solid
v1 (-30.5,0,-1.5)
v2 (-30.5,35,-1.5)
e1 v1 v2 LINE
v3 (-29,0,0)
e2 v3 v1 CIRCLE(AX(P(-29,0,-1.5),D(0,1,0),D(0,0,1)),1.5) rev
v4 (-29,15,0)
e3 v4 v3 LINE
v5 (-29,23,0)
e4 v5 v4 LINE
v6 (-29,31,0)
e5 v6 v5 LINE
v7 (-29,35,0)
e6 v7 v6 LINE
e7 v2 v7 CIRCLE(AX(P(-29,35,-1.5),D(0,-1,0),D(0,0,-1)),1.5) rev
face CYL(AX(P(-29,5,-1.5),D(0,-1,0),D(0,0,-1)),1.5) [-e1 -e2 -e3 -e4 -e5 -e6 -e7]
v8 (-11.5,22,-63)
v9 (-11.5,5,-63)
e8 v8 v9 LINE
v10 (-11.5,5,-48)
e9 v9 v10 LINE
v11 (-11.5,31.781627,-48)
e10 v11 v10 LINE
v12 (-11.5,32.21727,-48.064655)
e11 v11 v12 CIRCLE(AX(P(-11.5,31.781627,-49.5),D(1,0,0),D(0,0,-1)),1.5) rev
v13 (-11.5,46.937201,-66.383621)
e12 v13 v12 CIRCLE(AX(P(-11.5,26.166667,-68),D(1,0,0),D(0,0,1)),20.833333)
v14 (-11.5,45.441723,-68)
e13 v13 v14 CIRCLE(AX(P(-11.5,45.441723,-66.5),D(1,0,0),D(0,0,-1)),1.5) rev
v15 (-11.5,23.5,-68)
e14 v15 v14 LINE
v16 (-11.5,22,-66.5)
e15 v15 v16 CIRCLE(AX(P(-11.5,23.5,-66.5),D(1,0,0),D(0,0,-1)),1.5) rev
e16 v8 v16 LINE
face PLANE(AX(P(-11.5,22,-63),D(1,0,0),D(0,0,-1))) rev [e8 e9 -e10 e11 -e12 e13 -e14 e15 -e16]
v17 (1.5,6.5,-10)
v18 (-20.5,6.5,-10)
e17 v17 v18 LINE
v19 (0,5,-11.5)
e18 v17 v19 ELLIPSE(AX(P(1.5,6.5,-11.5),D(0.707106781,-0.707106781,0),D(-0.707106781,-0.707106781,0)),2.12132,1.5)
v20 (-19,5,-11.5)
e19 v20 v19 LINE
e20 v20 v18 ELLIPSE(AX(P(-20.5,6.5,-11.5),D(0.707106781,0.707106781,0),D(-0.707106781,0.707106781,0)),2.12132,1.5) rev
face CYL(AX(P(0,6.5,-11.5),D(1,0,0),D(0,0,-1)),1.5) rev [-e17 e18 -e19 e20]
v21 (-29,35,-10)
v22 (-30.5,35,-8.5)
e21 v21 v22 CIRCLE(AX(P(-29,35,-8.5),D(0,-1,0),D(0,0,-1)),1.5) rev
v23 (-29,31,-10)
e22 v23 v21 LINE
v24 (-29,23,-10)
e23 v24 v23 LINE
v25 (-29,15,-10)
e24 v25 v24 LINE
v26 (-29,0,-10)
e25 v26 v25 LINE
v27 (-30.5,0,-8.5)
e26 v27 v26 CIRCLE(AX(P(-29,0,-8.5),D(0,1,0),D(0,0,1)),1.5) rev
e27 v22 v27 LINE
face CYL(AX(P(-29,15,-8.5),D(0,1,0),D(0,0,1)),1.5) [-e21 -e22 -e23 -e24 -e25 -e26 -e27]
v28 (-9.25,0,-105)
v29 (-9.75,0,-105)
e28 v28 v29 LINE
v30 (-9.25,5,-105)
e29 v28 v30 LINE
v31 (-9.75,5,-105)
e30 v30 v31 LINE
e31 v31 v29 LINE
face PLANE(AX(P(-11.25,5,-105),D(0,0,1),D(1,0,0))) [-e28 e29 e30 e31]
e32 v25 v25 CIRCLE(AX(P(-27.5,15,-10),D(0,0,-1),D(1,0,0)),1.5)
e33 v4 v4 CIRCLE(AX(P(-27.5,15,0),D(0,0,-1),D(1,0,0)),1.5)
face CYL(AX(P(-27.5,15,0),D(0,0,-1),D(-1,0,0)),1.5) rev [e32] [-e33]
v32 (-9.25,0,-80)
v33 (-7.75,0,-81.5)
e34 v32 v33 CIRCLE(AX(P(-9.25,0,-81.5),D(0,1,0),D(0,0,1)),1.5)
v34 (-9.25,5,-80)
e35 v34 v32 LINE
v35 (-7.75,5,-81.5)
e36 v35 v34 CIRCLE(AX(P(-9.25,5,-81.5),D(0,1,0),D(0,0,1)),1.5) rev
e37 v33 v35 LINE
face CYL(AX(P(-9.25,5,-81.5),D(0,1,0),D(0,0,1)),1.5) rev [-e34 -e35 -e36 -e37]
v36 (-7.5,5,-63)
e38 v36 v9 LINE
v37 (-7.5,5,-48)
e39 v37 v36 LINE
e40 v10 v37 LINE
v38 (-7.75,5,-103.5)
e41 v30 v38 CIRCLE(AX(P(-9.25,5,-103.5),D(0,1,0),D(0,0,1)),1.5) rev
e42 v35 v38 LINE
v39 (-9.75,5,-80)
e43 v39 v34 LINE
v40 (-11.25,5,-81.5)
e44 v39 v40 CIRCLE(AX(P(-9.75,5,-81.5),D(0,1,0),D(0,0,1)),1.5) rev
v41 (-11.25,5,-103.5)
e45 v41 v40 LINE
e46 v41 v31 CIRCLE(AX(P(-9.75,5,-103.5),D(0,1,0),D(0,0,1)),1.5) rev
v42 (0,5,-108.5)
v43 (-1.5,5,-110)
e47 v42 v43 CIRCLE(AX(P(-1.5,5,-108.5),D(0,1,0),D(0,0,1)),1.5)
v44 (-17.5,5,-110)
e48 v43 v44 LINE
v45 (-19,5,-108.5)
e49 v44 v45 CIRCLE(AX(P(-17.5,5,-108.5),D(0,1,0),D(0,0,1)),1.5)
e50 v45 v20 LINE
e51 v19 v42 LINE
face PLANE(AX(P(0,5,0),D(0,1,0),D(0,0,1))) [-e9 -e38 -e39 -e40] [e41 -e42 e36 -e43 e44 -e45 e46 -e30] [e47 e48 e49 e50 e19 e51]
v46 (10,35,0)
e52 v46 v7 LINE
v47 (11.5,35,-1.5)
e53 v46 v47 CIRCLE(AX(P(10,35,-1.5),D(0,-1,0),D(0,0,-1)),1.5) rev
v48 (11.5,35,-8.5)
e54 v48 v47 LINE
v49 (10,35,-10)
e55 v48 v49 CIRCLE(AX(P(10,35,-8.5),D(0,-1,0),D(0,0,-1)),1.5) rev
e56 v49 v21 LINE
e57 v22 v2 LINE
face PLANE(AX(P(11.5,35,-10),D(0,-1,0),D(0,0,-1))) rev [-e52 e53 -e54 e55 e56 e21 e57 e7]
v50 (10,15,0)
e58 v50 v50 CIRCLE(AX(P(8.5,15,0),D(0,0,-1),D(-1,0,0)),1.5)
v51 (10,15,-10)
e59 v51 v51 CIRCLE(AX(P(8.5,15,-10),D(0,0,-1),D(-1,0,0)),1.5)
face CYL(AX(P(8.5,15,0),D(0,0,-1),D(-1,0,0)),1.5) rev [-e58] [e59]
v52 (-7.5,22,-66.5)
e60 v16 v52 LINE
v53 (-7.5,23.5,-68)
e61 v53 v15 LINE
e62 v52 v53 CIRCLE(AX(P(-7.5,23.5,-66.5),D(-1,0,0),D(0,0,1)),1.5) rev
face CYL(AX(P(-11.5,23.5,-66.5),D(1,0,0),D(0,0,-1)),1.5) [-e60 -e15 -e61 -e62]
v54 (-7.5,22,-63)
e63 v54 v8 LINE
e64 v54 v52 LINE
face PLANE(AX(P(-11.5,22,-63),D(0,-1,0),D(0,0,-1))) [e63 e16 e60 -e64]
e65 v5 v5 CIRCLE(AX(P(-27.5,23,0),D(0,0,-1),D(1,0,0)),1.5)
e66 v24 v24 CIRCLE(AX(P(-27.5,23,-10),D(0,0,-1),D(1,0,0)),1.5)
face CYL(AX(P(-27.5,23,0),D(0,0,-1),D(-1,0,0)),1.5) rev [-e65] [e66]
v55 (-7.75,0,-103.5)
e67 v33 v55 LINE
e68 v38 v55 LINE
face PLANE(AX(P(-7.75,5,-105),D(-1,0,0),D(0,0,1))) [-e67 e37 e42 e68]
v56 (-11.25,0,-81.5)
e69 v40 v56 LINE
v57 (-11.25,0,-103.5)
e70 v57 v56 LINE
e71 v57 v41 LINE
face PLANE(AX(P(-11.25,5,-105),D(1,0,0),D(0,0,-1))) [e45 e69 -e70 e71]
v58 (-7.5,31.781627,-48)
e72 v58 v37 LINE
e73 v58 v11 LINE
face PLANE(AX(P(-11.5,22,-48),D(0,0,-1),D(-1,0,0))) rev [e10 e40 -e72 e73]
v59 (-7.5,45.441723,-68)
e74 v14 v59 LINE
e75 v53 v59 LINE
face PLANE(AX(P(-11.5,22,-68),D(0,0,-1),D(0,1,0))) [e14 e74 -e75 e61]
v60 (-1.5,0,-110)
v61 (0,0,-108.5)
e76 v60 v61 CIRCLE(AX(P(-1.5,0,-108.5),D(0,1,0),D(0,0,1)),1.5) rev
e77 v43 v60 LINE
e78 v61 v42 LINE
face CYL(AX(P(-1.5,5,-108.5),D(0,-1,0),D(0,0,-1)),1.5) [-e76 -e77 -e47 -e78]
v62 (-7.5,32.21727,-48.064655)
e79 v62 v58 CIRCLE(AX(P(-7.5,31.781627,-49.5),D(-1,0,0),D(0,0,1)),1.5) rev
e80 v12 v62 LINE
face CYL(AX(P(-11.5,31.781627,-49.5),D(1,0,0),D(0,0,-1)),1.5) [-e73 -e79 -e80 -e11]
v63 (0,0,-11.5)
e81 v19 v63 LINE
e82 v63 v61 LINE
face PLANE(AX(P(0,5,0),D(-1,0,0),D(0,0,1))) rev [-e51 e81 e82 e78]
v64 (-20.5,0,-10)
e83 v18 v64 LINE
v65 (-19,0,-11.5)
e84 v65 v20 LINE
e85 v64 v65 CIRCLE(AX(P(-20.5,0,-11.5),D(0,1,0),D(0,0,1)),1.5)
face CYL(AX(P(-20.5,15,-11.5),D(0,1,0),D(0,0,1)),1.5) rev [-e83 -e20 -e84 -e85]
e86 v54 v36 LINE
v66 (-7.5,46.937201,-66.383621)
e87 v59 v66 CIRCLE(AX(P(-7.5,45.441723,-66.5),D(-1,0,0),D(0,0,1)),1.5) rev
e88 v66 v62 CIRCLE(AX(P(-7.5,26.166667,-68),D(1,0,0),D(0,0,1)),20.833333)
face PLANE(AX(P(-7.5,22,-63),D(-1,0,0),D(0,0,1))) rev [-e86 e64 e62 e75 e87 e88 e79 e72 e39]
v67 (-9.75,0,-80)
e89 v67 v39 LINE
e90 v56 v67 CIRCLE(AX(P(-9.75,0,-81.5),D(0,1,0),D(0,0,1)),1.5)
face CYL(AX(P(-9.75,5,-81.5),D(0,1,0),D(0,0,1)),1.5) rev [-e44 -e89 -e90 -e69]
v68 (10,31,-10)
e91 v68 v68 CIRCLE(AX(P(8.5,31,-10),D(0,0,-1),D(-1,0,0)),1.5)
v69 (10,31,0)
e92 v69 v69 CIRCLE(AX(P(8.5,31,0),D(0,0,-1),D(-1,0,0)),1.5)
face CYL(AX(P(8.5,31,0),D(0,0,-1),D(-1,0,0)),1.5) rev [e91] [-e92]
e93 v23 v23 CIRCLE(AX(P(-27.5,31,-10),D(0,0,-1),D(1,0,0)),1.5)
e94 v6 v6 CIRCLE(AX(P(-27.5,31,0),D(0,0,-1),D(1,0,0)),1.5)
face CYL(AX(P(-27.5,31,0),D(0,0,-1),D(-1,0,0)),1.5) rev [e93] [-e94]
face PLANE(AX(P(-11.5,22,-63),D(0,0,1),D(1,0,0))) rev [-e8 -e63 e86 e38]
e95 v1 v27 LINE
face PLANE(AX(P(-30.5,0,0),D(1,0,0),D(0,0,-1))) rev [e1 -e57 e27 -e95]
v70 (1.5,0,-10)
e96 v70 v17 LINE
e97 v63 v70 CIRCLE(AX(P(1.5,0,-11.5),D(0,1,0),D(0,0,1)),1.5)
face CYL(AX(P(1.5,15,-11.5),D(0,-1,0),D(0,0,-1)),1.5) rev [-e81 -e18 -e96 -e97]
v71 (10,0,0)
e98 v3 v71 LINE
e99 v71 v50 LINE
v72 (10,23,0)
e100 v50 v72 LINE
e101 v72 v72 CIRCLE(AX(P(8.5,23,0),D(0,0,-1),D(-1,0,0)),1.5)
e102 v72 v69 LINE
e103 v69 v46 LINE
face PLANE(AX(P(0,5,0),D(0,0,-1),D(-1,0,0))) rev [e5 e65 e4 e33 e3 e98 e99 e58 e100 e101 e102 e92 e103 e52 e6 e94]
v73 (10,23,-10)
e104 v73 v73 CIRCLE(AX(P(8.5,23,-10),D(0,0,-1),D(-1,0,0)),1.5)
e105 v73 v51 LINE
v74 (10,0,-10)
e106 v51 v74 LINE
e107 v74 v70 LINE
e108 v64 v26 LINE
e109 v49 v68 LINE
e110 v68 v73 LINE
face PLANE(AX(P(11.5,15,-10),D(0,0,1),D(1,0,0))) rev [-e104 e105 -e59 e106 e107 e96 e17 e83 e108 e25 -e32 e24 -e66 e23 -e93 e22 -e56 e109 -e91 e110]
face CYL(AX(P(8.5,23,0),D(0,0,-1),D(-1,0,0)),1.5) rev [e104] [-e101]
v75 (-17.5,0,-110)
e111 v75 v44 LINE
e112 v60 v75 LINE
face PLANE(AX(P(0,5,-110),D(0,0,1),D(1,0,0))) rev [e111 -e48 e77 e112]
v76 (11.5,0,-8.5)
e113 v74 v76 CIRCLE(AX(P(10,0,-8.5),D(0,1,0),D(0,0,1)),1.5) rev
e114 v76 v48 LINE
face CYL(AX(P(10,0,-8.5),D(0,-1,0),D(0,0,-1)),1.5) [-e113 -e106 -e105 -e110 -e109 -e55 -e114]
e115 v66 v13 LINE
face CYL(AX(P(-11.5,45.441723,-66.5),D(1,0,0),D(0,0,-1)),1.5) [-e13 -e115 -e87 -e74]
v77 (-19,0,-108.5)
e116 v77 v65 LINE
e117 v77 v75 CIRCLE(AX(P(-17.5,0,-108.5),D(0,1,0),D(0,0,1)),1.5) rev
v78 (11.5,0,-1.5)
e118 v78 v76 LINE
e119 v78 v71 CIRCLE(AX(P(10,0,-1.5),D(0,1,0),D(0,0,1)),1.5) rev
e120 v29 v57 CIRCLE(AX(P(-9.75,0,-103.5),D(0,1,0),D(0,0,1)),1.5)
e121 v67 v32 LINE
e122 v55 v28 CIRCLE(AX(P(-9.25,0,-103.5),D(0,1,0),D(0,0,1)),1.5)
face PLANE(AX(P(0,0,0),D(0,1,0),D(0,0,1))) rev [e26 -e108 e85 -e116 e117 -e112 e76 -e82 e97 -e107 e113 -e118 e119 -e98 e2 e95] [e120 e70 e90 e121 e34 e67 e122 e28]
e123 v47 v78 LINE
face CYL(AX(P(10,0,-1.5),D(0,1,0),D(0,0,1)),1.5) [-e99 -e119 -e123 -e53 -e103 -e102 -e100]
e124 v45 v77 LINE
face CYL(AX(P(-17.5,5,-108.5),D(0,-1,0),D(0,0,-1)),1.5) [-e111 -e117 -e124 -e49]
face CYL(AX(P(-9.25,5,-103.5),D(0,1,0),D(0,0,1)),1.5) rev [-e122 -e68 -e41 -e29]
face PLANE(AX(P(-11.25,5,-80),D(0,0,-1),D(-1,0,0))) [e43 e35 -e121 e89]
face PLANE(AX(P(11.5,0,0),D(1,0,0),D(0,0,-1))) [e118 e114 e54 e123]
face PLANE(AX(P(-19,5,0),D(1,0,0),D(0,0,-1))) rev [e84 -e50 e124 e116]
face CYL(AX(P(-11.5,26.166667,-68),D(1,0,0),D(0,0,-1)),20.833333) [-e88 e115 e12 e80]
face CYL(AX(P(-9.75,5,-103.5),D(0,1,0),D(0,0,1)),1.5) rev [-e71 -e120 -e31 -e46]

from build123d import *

# Parameters (mm, degrees)
SKETCH1_W                = 19
SKETCH1_H                = 110
SKETCH1_W_2              = 3.5
SKETCH1_H_2              = 25
BOSS_EXTRUDE1_DEPTH      = 5
BOSS_EXTRUDE2_DEPTH      = 11.5
BOSS_EXTRUDE2_DEPTH_BACK = 30.5
SKETCH3_R                = 1.5
CUT_EXTRUDE1_DEPTH       = 10
SKETCH4_W                = 4
SKETCH4_H                = 15
BOSS_EXTRUDE3_DEPTH      = 17
BOSS_EXTRUDE4_DEPTH      = 4
FILLET1_R                = 1.5


with BuildPart() as part:
    # Sketch1 → Boss-Extrude1 (new body)
    with BuildSketch(Plane(origin=(0, 0, 0), x_dir=(1, 0, 0), z_dir=(0, 1, 0))):
        with Locations((-9.5, 55)):
            Rectangle(SKETCH1_W, SKETCH1_H)
        with Locations((-9.5, 92.5)):
            Rectangle(SKETCH1_W_2, SKETCH1_H_2, mode=Mode.SUBTRACT)
    extrude(amount=BOSS_EXTRUDE1_DEPTH)

    # Sketch2 → Boss-Extrude2 (add, two sides: drawn at the far end of the back side and taken through both)
    with BuildSketch(Plane(origin=(0, 0, 0), x_dir=(0, 0, -1), z_dir=(1, 0, 0)).offset(-BOSS_EXTRUDE2_DEPTH_BACK)):
        Polygon((10, 15), (10, 35), (0, 35), (0, 15), (0, 5), (0, 0), (10, 0), (10, 5), align=None)
    extrude(amount=BOSS_EXTRUDE2_DEPTH + BOSS_EXTRUDE2_DEPTH_BACK)

    # Sketch3 → Cut-Extrude1 (cut)
    with BuildSketch(Plane(origin=(0, 0, -10), x_dir=(-1, 0, 0), z_dir=(0, 0, -1))):
        with Locations((-8.5, 31)):
            Circle(SKETCH3_R)
        with Locations((-8.5, 23)):
            Circle(SKETCH3_R)
        with Locations((-8.5, 15)):
            Circle(SKETCH3_R)
        with Locations(Location((27.5, 15, 0), (0, 0, 180))):
            Circle(SKETCH3_R)
        with Locations(Location((27.5, 23, 0), (0, 0, 180))):
            Circle(SKETCH3_R)
        with Locations(Location((27.5, 31, 0), (0, 0, 180))):
            Circle(SKETCH3_R)
    extrude(amount=-CUT_EXTRUDE1_DEPTH, mode=Mode.SUBTRACT)

    # Sketch4 → Boss-Extrude3 (add)
    with BuildSketch(Plane(origin=(0, 5, 0), x_dir=(1, 0, 0), z_dir=(0, 1, 0))):
        with Locations((-9.5, 55.5)):
            Rectangle(SKETCH4_W, SKETCH4_H)
    extrude(amount=BOSS_EXTRUDE3_DEPTH)

    # Sketch5 → Boss-Extrude4 (add)
    with BuildSketch(Plane(origin=(-7.5, 0, 0), x_dir=(0, 0, -1), z_dir=(1, 0, 0))):
        with BuildLine():
            Line((63, 22), (68, 22))
            Line((68, 22), (68, 47))
            ThreePointArc((68, 47), (55.5, 42.833333333), (48, 32))
            Line((48, 32), (48, 22))
            Line((48, 22), (63, 22))
        make_face()
    extrude(amount=-BOSS_EXTRUDE4_DEPTH)

    # Fillet1
    fillet1_edges = [part.edges().sort_by_distance(p)[0] for p in [
        (-11.25, 2.5, -105),
        (-11.25, 2.5, -80),
        (-7.75, 2.5, -80),
        (-7.75, 2.5, -105),
        (-19, 2.5, -10),
        (0, 2.5, -10),
        (-30.5, 17.5, -10),
        (-30.5, 17.5, 0),
        (-9.5, 5, -10),
        (11.5, 17.5, 0),
        (11.5, 17.5, -10),
        (-19, 2.5, -110),
        (0, 2.5, -110),
        (-9.5, 32, -48),
        (-9.5, 47, -68),
        (-9.5, 22, -68),
    ]]
    fillet(fillet1_edges, radius=FILLET1_R - 0.0001)  # a hair under: the kernel refuses the full size


solid = part.part
